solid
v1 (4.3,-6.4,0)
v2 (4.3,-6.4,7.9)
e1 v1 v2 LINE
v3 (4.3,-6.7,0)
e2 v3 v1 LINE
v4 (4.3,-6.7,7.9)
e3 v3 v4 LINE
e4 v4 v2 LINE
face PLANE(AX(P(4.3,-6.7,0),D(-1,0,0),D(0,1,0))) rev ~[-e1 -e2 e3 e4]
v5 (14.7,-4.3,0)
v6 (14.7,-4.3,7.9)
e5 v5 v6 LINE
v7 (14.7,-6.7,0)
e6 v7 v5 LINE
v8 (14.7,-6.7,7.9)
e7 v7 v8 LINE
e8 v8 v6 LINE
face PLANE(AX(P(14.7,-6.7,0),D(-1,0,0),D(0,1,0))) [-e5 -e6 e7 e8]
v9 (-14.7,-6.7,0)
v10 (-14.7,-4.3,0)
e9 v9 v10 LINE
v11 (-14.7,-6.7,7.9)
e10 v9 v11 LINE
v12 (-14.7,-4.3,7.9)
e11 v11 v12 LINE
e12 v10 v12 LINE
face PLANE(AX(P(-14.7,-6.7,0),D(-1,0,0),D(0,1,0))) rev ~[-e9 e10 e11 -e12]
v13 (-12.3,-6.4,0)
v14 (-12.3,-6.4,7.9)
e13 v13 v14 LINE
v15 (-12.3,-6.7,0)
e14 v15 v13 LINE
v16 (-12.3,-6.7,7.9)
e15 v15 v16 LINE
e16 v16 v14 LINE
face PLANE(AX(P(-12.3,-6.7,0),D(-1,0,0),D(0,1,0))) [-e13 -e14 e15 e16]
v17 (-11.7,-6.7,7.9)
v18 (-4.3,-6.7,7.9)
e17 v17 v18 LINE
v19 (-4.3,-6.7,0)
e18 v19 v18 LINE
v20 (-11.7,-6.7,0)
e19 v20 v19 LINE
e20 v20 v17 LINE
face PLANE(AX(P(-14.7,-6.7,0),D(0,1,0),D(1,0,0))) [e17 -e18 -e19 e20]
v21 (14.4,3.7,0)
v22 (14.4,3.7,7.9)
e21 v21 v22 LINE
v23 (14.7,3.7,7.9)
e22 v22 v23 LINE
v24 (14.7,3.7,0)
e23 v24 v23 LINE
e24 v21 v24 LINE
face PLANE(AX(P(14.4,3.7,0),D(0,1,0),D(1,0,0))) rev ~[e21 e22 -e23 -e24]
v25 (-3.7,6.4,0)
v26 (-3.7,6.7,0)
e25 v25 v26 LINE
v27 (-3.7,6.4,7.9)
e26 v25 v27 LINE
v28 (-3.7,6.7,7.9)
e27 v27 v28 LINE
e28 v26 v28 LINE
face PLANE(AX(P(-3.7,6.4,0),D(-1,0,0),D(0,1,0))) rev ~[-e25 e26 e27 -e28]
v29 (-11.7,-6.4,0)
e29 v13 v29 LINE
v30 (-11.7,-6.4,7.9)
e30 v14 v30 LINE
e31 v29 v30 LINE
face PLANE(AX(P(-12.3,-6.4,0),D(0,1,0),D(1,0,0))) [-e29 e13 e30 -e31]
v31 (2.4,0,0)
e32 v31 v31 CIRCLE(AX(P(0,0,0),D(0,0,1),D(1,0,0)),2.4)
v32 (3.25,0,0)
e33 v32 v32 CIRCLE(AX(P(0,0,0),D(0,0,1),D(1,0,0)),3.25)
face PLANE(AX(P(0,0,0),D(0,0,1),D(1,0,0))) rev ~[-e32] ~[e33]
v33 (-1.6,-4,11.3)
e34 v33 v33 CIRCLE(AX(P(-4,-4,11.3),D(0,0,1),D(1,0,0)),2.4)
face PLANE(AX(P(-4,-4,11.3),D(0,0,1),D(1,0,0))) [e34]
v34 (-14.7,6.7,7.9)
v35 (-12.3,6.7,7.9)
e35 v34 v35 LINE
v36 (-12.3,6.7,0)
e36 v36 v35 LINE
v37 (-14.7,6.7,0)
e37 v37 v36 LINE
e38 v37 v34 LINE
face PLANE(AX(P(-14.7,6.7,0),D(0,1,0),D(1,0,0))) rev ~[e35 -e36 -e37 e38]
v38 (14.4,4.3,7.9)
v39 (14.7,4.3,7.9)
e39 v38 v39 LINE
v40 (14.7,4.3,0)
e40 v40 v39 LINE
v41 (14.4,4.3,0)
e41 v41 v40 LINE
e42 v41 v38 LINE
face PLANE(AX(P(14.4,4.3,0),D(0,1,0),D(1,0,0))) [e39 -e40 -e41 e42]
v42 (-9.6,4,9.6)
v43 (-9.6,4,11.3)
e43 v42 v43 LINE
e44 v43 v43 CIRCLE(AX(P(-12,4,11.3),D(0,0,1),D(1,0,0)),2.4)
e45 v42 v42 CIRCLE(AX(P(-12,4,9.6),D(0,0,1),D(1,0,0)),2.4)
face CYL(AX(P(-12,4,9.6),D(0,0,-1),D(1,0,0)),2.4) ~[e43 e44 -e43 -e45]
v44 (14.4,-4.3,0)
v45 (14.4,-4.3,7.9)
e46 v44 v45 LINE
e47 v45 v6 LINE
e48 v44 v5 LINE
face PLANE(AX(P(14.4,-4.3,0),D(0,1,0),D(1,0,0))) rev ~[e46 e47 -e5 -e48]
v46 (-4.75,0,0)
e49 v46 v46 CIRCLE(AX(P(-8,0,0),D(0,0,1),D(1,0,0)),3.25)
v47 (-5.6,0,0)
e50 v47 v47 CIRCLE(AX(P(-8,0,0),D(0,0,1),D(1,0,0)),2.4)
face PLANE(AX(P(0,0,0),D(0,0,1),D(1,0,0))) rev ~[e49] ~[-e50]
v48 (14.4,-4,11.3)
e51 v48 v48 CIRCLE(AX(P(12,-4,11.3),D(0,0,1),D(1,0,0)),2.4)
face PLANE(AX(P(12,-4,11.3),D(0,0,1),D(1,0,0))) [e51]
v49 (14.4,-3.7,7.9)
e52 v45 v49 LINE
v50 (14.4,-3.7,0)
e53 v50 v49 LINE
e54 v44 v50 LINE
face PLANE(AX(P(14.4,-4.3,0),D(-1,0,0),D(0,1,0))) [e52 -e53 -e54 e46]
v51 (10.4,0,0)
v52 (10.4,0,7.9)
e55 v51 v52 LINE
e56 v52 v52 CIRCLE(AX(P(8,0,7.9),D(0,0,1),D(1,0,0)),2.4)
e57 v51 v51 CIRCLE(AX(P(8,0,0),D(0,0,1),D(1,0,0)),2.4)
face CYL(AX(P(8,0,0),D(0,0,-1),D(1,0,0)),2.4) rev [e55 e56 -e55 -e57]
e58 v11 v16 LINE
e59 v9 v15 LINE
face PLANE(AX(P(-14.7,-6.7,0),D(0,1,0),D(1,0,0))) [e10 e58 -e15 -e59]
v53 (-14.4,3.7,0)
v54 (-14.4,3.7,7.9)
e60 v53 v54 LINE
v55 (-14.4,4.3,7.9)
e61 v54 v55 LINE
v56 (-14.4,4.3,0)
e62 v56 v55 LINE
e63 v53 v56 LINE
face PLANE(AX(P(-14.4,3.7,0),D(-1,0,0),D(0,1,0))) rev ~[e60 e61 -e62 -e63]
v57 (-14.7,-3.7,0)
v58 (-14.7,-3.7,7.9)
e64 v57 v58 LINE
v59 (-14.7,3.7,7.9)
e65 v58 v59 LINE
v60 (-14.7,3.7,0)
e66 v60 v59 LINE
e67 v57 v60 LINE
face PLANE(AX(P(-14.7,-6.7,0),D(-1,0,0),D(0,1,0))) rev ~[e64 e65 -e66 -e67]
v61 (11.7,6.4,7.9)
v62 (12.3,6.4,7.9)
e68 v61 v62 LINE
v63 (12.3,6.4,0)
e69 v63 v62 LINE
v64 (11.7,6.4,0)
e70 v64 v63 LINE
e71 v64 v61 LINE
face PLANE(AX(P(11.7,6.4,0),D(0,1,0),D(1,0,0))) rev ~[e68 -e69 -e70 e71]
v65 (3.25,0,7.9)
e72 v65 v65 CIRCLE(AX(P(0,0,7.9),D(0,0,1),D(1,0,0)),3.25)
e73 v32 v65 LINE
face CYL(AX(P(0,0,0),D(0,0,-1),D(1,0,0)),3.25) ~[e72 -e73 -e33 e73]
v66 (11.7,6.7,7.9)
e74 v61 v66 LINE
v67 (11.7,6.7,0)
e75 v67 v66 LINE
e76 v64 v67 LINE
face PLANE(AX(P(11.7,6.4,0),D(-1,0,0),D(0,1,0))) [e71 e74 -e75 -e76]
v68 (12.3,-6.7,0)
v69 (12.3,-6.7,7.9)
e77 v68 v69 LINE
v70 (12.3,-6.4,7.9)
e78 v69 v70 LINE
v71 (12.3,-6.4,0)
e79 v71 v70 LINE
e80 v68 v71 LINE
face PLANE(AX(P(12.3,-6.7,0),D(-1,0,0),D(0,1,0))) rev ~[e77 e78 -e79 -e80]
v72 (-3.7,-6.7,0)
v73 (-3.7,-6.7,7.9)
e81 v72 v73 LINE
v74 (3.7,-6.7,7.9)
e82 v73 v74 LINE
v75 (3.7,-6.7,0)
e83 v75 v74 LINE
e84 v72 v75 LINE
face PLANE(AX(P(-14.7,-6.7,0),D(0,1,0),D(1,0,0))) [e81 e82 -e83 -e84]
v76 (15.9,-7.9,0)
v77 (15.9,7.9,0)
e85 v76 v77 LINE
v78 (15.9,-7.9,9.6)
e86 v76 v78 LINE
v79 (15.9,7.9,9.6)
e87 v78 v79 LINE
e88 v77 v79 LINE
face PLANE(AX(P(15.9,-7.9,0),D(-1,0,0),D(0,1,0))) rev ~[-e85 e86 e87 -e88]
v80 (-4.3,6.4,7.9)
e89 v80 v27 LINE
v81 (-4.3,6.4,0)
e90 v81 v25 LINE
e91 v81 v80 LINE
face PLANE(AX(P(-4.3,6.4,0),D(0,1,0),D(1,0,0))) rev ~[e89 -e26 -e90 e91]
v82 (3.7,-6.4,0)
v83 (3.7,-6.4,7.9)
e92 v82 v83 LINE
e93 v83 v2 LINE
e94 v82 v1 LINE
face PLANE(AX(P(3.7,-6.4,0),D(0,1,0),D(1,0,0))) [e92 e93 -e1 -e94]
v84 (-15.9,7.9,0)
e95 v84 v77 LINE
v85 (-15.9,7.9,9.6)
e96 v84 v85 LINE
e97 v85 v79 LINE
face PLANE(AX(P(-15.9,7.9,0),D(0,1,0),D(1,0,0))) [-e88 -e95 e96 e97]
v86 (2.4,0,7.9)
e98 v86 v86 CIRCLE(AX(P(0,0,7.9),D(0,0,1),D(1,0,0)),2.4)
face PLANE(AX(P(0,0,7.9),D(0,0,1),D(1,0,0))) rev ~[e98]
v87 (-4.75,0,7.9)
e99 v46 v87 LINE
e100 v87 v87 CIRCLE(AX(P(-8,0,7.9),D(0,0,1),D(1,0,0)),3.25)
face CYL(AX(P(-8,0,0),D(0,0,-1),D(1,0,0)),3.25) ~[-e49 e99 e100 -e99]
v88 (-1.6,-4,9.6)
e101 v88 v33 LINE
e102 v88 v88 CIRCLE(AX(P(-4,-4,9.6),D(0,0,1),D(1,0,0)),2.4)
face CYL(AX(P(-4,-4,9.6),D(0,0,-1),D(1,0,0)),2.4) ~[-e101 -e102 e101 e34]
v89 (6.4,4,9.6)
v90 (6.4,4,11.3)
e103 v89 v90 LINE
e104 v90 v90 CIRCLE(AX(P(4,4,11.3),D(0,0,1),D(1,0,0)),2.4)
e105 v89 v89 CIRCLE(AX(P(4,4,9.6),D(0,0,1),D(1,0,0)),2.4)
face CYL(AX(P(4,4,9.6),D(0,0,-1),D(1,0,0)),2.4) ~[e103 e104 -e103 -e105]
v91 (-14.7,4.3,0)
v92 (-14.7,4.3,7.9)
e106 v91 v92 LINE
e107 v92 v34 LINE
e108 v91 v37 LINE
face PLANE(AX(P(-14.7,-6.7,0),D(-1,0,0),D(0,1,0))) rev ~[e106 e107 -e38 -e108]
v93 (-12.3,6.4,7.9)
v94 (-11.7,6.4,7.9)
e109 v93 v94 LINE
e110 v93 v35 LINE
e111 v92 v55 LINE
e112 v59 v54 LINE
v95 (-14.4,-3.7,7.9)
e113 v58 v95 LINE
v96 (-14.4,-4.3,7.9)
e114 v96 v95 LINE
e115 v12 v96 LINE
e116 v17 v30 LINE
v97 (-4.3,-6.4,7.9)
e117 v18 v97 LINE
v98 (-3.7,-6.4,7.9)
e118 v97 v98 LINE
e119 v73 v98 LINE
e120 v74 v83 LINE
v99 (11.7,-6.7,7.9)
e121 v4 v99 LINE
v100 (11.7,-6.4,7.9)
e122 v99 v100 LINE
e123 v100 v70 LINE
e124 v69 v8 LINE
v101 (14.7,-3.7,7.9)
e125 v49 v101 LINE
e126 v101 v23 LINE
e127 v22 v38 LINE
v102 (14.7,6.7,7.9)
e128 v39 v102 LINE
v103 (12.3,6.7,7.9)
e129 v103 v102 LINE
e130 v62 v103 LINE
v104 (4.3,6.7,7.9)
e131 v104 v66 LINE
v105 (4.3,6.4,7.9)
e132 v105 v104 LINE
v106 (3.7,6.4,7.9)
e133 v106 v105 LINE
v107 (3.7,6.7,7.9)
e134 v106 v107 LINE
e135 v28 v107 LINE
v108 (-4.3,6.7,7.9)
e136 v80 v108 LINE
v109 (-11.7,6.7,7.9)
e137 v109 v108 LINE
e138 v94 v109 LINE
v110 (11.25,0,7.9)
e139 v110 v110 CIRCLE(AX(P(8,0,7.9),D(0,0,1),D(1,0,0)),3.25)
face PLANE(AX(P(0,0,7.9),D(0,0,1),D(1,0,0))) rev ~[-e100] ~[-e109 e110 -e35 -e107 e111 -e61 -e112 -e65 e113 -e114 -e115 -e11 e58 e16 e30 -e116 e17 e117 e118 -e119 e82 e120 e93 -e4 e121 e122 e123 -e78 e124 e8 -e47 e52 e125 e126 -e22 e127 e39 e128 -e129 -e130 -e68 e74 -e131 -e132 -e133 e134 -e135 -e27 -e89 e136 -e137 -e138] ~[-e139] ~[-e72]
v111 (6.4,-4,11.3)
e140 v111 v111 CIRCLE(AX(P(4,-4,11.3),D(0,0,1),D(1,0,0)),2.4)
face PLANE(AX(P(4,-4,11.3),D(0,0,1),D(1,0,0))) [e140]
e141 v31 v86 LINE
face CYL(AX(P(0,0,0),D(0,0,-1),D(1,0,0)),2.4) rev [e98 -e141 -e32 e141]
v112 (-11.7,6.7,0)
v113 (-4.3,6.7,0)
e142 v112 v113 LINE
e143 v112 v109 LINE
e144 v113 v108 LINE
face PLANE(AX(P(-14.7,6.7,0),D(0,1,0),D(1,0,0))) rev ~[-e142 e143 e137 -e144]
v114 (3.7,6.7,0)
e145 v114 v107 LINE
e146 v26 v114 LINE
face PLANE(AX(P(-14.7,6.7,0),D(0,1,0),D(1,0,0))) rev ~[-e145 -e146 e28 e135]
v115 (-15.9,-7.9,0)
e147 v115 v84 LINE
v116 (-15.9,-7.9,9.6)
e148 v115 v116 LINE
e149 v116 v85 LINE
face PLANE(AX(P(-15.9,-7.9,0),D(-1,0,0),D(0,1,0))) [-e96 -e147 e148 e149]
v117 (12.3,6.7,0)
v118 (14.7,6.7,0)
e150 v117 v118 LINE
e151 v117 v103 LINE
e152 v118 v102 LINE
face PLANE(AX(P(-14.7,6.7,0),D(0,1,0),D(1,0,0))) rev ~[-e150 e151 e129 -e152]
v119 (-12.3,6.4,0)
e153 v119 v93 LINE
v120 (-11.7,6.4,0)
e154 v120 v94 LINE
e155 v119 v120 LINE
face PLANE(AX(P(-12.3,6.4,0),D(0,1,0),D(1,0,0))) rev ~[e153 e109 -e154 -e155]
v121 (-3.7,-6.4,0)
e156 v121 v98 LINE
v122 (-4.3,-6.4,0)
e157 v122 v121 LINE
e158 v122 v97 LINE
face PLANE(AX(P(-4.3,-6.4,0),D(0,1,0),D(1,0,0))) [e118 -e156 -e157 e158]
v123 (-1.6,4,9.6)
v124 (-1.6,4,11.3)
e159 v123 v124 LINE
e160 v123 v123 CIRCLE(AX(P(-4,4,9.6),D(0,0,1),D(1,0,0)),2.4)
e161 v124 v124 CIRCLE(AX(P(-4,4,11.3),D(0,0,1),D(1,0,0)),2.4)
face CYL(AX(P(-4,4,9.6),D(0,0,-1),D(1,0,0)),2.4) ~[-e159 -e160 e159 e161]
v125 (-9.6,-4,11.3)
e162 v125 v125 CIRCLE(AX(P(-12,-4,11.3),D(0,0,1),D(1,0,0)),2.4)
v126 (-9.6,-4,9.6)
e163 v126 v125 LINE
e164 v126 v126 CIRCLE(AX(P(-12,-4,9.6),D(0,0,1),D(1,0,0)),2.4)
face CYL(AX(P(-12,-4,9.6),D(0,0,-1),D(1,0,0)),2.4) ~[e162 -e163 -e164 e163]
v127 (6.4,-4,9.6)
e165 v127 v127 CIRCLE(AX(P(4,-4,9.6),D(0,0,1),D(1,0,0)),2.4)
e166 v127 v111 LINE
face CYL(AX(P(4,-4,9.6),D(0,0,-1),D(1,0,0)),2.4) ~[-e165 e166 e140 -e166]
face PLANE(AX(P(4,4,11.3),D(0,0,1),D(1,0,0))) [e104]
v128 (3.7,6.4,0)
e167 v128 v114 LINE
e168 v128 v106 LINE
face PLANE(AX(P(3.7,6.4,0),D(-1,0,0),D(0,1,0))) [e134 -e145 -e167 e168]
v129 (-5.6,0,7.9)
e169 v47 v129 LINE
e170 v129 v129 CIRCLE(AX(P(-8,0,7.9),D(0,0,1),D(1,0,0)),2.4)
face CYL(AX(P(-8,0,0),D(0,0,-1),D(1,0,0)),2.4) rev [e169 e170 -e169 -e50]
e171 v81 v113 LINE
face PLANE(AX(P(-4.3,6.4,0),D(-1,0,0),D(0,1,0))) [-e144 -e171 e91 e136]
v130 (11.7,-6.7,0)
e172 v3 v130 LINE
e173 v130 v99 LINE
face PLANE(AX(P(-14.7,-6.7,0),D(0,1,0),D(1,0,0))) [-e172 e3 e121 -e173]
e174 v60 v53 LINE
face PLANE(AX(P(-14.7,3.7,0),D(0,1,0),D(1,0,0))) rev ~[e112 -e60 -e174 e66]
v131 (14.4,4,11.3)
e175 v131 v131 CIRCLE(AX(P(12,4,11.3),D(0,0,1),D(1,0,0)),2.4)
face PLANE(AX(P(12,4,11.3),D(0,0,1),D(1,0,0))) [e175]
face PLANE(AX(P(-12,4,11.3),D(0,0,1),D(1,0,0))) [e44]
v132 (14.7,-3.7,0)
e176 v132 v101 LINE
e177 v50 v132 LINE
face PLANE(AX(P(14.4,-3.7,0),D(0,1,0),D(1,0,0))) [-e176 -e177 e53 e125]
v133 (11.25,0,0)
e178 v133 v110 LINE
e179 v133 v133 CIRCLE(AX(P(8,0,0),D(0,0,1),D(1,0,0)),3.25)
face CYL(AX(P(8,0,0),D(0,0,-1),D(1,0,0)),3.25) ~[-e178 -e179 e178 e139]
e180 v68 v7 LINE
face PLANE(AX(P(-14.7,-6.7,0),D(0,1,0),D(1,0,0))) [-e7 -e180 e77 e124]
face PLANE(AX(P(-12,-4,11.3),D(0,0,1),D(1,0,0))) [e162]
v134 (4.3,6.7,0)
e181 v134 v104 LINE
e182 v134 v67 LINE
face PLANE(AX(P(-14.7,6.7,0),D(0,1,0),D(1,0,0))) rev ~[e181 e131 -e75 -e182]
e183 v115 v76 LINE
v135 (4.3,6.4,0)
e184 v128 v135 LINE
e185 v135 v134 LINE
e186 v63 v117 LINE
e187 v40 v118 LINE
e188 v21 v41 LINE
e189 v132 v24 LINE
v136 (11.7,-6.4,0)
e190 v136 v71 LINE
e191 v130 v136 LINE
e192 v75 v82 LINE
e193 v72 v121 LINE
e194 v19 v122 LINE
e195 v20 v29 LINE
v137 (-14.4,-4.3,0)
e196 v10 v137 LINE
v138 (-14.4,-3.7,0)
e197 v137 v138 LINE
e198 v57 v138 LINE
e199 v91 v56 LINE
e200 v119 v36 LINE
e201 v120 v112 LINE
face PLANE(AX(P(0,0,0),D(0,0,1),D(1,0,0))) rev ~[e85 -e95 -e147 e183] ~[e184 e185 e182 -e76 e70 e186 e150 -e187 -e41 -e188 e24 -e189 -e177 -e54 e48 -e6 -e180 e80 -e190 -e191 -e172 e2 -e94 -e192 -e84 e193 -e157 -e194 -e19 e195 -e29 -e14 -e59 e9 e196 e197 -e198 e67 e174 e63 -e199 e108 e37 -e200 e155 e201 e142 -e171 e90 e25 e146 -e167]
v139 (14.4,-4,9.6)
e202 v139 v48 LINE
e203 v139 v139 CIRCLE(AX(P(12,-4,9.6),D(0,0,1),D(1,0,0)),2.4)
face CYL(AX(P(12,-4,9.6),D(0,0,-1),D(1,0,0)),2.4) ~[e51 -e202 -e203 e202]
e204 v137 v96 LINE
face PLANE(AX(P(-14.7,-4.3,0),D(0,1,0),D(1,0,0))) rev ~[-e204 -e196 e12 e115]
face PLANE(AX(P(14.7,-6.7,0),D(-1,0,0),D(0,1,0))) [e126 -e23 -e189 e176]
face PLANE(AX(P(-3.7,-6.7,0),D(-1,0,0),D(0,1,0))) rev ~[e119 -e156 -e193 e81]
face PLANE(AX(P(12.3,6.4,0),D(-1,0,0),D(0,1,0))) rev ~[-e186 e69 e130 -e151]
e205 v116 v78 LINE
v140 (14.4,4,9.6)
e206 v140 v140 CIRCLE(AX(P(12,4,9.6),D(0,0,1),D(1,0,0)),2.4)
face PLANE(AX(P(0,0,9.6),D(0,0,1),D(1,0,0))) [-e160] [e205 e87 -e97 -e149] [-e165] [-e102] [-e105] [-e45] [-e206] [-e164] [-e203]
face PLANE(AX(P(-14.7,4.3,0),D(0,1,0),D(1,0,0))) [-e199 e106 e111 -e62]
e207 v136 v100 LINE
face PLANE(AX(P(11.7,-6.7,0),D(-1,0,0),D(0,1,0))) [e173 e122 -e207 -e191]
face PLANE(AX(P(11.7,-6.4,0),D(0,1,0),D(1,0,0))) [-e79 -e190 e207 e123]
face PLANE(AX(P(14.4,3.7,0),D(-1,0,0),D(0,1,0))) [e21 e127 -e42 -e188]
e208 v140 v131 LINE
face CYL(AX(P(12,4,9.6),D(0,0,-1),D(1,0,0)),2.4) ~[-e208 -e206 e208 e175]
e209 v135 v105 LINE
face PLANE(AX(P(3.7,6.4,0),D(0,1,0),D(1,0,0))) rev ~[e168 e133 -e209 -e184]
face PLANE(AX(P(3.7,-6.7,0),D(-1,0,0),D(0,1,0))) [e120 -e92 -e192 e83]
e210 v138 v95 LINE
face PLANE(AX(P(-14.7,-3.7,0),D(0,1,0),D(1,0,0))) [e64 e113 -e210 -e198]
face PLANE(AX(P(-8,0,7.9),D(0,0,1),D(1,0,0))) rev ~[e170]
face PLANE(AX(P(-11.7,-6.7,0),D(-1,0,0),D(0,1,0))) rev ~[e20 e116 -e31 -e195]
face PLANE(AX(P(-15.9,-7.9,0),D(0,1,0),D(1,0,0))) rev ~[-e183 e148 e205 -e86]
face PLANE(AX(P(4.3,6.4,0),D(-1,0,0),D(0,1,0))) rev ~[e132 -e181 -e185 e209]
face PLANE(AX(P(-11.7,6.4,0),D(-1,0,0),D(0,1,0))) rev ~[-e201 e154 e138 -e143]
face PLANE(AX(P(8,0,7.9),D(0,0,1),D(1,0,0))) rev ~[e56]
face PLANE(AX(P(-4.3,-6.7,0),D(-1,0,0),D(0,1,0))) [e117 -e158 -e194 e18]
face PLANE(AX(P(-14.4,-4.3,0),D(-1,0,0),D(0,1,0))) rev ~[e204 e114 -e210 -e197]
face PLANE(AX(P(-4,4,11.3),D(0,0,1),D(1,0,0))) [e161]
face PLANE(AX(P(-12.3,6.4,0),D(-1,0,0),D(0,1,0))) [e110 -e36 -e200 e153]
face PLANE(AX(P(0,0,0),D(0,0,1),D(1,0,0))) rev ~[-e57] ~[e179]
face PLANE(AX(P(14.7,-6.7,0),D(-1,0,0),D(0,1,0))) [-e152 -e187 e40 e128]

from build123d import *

# Parameters (mm, degrees)
F0_W     = 31.8
F0_H     = 15.8
F0_W_2   = 29.4
F0_H_2   = 13.4
F0_R     = 3.25
F0_R_2   = 2.4
F1_DEPTH = 9.6
F2_DEPTH = 7.9
F3_R     = 2.4
F4_DEPTH = 1.7
F5_W     = 0.6
F5_H     = 0.3
F5_W_2   = 0.3
F5_H_2   = 0.6
F6_DEPTH = 7.9


# Not quite as in the source:
# - a feature names something its author has since deleted; it is built from what else it names


with BuildPart() as f1:
    # F0 (on Top) → F1 (new body)
    with BuildSketch(Plane.XY):
        Rectangle(F0_W, F0_H)
        Rectangle(F0_W_2, F0_H_2, mode=Mode.SUBTRACT)
        Rectangle(F0_W_2, F0_H_2)
        with Locations((-8, 0)):
            Circle(F0_R, mode=Mode.SUBTRACT)
        Circle(F0_R, mode=Mode.SUBTRACT)
        with Locations((8, 0)):
            Circle(F0_R, mode=Mode.SUBTRACT)
        with Locations((-8, 0)):
            Circle(F0_R)
        with Locations((-8, 0)):
            Circle(F0_R_2, mode=Mode.SUBTRACT)
        Circle(F0_R)
        Circle(F0_R_2, mode=Mode.SUBTRACT)
        with Locations((8, 0)):
            Circle(F0_R)
        with Locations((8, 0)):
            Circle(F0_R_2, mode=Mode.SUBTRACT)
        with Locations((-8, 0)):
            Circle(F0_R_2)
        Circle(F0_R_2)
        with Locations((8, 0)):
            Circle(F0_R_2)
    extrude(amount=F1_DEPTH)

    # F0 (on Top) → F2 (cut)
    with BuildSketch(Plane.XY):
        Rectangle(F0_W_2, F0_H_2)
        with Locations((-8, 0)):
            Circle(F0_R, mode=Mode.SUBTRACT)
        Circle(F0_R, mode=Mode.SUBTRACT)
        with Locations((8, 0)):
            Circle(F0_R, mode=Mode.SUBTRACT)
        with Locations((-8, 0)):
            Circle(F0_R_2)
        with Locations((8, 0)):
            Circle(F0_R_2)
        Circle(F0_R_2)
    extrude(amount=F2_DEPTH, mode=Mode.SUBTRACT)

    # F3 (on face) → F4 (join)
    with BuildSketch(Plane.XY.offset(9.6)):
        with Locations((-12, 4)):
            Circle(F3_R)
        with Locations((-12, -4)):
            Circle(F3_R)
        with Locations((-4, 4)):
            Circle(F3_R)
        with Locations((-4, -4)):
            Circle(F3_R)
        with Locations((4, 4)):
            Circle(F3_R)
        with Locations((4, -4)):
            Circle(F3_R)
        with Locations((12, 4)):
            Circle(F3_R)
        with Locations((12, -4)):
            Circle(F3_R)
    extrude(amount=F4_DEPTH)

    # F5 (on Top) → F6 (join, through all)
    with BuildSketch(Plane.XY):
        with Locations((-12, -6.55)):
            Rectangle(F5_W, F5_H)
        with Locations((-4, -6.55)):
            Rectangle(F5_W, F5_H)
        with Locations((-14.55, -4)):
            Rectangle(F5_W_2, F5_H_2)
        with Locations((4, -6.55)):
            Rectangle(F5_W, F5_H)
        with Locations((12, -6.55)):
            Rectangle(F5_W, F5_H)
        with Locations((14.55, -4)):
            Rectangle(F5_W_2, F5_H_2)
        with Locations((-4, 6.55)):
            Rectangle(F5_W, F5_H)
        with Locations((14.55, 4)):
            Rectangle(F5_W_2, F5_H_2)
        with Locations((12, 6.55)):
            Rectangle(F5_W, F5_H)
        with Locations((-12, 6.55)):
            Rectangle(F5_W, F5_H)
        with Locations((-14.55, 4)):
            Rectangle(F5_W_2, F5_H_2)
        with Locations((4, 6.55)):
            Rectangle(F5_W, F5_H)
    extrude(amount=F6_DEPTH)


solid = f1.part
